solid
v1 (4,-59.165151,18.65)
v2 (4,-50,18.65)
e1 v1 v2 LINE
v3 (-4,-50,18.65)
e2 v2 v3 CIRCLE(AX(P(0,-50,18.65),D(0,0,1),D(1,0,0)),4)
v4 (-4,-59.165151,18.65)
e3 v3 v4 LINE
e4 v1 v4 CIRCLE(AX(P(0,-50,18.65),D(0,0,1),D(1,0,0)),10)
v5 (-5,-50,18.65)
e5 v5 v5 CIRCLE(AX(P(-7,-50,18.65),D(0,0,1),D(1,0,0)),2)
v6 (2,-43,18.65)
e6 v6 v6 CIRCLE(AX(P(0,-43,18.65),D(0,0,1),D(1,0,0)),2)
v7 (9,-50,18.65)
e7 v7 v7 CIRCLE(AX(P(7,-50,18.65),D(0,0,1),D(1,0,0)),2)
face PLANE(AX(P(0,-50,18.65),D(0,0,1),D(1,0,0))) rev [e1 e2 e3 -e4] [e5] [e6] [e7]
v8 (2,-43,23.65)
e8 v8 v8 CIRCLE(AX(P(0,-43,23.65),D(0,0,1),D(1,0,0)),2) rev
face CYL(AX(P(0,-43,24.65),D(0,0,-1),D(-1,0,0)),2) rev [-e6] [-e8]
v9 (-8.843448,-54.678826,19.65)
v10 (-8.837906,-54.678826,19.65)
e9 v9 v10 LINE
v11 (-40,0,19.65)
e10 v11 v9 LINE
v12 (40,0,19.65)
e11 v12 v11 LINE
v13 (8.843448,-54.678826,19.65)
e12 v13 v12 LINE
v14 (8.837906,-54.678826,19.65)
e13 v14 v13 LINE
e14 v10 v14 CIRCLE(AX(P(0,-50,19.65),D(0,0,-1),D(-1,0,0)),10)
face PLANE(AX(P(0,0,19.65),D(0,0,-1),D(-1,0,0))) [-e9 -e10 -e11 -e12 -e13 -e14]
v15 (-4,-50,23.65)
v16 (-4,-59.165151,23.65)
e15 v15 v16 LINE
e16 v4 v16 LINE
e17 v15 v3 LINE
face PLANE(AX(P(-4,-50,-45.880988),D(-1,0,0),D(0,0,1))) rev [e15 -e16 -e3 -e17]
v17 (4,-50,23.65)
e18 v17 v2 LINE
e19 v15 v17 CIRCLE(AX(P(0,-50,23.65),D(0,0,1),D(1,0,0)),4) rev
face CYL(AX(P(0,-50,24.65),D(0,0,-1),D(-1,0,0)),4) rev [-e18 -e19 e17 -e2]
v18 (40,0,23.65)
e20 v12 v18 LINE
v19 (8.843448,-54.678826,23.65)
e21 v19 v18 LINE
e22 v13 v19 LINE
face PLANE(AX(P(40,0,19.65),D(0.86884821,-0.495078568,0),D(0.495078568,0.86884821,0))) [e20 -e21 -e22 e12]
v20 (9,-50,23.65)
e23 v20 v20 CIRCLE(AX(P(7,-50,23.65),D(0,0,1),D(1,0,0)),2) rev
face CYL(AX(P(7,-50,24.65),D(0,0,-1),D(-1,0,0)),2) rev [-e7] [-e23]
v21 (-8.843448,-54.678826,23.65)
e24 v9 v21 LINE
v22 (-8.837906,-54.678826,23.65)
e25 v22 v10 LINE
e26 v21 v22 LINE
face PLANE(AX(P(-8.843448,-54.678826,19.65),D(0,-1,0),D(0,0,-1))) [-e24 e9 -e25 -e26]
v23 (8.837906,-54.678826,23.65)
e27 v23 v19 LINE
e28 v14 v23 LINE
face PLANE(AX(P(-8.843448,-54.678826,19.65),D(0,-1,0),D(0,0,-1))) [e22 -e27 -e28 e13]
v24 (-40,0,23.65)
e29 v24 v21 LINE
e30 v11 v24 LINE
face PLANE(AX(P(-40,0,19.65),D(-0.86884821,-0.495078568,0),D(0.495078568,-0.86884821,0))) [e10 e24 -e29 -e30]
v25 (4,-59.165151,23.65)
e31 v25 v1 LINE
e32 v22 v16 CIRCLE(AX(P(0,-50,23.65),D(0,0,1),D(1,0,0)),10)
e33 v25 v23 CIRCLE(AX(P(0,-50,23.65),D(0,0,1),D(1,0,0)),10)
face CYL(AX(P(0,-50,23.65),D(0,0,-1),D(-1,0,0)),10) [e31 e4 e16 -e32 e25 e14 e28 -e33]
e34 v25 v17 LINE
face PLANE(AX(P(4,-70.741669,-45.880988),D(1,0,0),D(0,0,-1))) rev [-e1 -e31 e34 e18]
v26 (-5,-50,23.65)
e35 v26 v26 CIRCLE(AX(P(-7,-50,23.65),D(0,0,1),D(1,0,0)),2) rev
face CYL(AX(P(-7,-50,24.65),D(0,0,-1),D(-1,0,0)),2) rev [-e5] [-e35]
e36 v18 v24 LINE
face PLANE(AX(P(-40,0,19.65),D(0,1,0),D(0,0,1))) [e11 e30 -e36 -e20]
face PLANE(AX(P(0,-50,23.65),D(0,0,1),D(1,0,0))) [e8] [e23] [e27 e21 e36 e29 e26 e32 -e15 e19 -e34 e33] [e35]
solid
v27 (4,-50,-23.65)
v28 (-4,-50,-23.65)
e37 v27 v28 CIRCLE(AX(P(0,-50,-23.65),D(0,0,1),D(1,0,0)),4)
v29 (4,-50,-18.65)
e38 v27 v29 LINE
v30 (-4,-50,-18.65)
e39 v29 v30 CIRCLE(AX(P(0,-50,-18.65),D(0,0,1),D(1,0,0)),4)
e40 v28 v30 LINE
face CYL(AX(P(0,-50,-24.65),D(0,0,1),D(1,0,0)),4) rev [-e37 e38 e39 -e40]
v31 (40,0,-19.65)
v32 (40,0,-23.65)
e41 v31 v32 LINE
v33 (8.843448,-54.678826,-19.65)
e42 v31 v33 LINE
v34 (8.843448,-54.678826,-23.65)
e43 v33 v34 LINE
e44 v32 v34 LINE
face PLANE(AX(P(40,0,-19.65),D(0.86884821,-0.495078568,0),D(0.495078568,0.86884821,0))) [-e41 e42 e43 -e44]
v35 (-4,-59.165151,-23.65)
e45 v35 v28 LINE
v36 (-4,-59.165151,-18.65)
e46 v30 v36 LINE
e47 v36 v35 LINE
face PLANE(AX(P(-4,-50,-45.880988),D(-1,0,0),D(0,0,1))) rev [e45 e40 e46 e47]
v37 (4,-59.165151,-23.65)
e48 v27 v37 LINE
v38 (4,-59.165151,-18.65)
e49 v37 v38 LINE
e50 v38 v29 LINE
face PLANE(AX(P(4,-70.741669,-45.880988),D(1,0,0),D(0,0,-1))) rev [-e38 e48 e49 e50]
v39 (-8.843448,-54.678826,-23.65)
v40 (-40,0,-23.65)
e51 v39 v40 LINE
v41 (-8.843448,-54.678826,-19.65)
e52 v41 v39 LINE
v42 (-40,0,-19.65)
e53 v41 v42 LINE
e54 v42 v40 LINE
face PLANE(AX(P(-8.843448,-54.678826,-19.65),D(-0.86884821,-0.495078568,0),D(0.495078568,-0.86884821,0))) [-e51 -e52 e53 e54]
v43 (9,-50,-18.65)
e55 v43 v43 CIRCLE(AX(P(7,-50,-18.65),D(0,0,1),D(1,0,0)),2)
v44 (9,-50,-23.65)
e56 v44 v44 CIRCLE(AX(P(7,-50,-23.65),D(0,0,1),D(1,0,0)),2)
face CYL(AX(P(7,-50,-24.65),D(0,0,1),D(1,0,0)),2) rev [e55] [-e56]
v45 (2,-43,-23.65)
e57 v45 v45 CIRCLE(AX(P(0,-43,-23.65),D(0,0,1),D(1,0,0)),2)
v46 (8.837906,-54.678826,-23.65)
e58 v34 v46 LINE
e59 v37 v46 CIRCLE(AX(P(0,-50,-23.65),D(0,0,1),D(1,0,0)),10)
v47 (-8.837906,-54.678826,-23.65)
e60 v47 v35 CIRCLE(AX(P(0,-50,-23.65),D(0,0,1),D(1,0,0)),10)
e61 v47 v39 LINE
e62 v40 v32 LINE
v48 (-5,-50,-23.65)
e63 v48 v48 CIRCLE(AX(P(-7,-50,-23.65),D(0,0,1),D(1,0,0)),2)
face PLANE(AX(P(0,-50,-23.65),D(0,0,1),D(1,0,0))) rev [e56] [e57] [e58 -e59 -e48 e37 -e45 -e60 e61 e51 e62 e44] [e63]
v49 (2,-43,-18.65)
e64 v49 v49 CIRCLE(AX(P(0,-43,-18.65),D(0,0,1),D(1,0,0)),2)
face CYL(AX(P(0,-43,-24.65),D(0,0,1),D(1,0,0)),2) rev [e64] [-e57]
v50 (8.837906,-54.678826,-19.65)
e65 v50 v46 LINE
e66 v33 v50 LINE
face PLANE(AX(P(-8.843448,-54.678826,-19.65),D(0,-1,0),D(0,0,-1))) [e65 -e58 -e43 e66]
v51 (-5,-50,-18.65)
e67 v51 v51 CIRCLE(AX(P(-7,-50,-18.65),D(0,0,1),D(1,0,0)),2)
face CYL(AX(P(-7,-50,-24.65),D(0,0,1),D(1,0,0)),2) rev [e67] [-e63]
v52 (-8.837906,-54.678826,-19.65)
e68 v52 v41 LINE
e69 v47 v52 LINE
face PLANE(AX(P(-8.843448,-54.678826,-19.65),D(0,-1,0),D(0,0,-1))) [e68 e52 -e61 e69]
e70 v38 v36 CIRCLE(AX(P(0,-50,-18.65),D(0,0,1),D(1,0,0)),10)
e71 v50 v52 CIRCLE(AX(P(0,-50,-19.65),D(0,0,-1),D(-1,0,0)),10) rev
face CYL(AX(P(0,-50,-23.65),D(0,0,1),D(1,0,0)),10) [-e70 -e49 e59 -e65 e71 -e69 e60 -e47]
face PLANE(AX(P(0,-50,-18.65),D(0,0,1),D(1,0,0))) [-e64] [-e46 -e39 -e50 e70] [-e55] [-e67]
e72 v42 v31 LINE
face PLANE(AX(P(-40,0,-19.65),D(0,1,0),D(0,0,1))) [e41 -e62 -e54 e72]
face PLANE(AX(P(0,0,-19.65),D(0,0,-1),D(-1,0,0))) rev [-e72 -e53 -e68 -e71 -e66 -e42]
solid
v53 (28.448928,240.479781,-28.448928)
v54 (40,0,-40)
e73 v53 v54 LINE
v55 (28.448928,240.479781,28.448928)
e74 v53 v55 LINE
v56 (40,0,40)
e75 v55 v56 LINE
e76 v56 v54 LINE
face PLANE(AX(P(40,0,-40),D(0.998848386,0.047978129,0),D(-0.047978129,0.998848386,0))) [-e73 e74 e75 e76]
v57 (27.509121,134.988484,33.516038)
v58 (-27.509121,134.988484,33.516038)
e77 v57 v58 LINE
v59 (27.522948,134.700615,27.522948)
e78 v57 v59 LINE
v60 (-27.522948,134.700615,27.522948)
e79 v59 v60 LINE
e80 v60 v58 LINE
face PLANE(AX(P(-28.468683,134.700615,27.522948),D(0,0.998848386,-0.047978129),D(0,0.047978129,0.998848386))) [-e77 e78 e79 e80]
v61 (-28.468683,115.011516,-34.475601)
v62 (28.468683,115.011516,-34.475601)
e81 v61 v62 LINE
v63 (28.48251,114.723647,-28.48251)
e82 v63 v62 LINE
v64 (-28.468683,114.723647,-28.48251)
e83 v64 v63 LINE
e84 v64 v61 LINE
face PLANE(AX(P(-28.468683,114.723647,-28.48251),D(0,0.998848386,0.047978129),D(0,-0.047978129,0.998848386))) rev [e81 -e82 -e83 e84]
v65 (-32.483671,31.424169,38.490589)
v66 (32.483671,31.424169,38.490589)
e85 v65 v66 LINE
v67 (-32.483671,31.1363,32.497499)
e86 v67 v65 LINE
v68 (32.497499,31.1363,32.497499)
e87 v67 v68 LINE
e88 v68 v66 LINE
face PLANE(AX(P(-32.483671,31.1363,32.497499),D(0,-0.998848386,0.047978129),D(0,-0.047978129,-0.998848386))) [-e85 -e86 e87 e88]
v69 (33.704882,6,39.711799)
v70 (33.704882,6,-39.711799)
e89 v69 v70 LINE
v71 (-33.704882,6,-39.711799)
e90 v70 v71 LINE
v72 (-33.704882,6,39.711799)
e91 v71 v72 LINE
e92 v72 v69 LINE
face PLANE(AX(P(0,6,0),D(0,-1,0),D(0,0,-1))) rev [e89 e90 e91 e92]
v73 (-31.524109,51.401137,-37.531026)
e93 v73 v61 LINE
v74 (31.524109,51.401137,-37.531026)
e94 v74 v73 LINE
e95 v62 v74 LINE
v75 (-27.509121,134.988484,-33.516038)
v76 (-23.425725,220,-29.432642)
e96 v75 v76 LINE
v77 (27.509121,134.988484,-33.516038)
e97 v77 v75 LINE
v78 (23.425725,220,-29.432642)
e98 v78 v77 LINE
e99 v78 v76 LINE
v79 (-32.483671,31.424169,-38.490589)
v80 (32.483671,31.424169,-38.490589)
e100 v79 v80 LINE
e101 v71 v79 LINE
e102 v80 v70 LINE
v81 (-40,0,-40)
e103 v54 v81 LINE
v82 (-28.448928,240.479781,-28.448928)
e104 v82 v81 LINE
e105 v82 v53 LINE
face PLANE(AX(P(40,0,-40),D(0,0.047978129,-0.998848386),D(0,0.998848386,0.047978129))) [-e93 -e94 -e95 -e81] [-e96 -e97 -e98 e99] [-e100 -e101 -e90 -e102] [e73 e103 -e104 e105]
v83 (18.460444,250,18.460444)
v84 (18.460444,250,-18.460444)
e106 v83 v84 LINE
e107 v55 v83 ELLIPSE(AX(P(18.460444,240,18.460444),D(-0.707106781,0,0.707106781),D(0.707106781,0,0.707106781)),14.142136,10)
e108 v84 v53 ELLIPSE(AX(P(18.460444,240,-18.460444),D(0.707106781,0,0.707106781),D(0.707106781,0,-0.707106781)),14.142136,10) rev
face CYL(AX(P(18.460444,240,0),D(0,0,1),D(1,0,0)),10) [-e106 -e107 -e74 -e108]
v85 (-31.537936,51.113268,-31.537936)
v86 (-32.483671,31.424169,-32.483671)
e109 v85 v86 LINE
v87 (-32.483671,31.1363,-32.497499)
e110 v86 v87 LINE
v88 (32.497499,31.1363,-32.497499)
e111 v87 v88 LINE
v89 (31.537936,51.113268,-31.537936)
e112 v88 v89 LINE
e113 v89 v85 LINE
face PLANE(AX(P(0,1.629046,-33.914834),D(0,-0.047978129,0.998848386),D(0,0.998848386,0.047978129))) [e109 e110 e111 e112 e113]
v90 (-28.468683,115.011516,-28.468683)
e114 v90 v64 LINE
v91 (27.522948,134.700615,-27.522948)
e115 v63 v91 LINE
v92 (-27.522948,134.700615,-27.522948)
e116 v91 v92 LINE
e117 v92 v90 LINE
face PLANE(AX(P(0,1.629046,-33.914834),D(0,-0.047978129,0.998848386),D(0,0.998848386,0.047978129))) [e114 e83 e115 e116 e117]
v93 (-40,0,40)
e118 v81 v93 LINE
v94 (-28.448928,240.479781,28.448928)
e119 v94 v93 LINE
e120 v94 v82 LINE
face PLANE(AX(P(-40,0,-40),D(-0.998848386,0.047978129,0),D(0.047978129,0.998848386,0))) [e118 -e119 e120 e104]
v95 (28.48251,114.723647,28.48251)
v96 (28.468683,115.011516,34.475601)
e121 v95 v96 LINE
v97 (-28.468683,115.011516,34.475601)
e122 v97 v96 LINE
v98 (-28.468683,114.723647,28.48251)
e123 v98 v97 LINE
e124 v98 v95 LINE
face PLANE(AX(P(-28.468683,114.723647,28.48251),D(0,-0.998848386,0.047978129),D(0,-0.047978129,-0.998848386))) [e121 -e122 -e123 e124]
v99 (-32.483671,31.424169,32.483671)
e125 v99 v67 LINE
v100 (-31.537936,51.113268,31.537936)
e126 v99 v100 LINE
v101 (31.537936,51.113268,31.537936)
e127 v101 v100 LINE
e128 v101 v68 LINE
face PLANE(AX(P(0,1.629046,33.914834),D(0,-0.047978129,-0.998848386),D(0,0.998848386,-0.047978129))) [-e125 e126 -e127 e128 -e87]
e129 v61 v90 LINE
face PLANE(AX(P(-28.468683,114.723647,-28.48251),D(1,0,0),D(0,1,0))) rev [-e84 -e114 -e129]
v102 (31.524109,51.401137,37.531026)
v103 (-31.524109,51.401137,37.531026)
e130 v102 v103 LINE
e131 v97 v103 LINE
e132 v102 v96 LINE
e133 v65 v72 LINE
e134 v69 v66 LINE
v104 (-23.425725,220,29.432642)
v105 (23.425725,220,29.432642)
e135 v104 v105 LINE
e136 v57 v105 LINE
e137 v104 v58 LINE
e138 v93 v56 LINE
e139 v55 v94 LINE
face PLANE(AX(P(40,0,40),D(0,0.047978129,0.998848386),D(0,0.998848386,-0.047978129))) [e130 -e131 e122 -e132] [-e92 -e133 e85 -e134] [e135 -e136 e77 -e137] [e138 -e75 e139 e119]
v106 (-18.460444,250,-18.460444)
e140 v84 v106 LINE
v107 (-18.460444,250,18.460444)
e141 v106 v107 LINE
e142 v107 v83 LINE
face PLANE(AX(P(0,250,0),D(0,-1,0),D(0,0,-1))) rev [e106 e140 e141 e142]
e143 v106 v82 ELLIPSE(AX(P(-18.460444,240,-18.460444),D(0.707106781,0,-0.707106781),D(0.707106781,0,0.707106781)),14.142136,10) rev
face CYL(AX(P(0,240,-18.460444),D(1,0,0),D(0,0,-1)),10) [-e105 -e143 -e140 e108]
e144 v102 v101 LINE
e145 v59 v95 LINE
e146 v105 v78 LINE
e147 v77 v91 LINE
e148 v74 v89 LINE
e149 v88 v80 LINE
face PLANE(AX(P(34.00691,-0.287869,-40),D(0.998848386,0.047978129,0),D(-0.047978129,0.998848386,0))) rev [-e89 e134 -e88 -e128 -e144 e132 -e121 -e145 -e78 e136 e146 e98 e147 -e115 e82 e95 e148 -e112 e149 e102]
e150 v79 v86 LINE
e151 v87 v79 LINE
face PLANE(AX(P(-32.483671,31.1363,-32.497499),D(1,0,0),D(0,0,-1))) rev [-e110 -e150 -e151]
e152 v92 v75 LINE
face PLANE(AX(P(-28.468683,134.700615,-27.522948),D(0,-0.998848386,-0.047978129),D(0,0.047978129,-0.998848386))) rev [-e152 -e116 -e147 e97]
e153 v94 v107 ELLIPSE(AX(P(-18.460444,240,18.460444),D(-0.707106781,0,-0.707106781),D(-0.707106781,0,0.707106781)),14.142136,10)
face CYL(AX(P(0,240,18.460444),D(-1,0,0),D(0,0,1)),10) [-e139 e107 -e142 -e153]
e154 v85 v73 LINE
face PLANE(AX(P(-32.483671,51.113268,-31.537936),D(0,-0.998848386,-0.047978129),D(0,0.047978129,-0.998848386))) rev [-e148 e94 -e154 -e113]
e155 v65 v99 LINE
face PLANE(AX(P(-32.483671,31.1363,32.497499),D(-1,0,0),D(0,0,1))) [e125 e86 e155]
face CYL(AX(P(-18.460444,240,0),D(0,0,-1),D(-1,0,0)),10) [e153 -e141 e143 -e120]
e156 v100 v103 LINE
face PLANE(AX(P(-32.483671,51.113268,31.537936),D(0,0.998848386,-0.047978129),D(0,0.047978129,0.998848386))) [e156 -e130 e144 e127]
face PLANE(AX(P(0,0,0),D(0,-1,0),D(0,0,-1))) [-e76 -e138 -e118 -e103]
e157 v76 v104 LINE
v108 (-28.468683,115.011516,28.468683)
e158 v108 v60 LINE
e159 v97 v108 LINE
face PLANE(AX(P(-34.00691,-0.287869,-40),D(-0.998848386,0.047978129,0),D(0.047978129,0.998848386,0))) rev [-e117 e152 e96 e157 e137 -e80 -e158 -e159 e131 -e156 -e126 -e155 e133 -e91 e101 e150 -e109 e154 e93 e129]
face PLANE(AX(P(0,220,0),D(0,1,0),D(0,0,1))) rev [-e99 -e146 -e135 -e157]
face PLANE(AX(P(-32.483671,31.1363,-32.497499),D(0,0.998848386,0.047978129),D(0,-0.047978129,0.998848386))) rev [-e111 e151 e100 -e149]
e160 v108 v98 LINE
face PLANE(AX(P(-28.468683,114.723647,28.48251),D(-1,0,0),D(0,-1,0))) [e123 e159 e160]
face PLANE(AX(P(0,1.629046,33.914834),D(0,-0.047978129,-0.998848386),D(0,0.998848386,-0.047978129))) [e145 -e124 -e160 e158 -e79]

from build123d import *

# Parameters (mm, degrees)
CROQUIS3_W                 = 80
CROQUIS3_H                 = 80
SALIENTE_EXTRUIR2_DEPTH    = 250
SALIENTE_EXTRUIR2_TAPER    = 2.75
VACIADO1_T                 = 6
CORTAR_EXTRUIR6_DEPTH      = 50
CORTAR_EXTRUIR6_DEPTH_BACK = 50
CROQUIS26_W                = 70.014697611
CROQUIS26_H                = 20
CROQUIS26_W_2              = 61.984721231
SALIENTE_EXTRUIR4_DEPTH    = 6
CROQUIS29_W                = 55.983277758
CROQUIS29_H                = 55.983277758
SALIENTE_EXTRUIR5_DEPTH    = 30
SALIENTE_EXTRUIR5_DRAFT    = 2.75
CROQUIS31_R                = 10
SALIENTE_EXTRUIR6_DEPTH    = 5
SALIENTE_EXTRUIR7_DEPTH    = 4
CROQUIS31_3_R              = 4
CROQUIS31_3_R_2            = 2
CORTAR_EXTRUIR10_DEPTH     = 6
CROQUIS33_R                = 10
SALIENTE_EXTRUIR8_DEPTH    = 5
SALIENTE_EXTRUIR9_DEPTH    = 4
CROQUIS33_3_R              = 2
CROQUIS33_3_R_2            = 4
CORTAR_EXTRUIR11_DEPTH     = 6
FILLET2_R                  = 10
CORTAR_EXTRUIR12_START     = -47.3
CROQUIS35_W                = 8
CROQUIS35_H                = 20.741669121
CORTAR_EXTRUIR12_DEPTH     = 47.3


with BuildPart() as part:
    # Croquis3 → Saliente-Extruir2 (new body)
    with BuildSketch(Plane(origin=(0, 0, 0), x_dir=(-1, 0, 0), z_dir=(0, 1, 0))):
        Rectangle(CROQUIS3_W, CROQUIS3_H)
    extrude(amount=SALIENTE_EXTRUIR2_DEPTH, taper=SALIENTE_EXTRUIR2_TAPER)

    # Vaciado1 (no face opened: a closed hollow body)
    add(offset(amount=-VACIADO1_T, mode=Mode.PRIVATE), mode=Mode.SUBTRACT)

    # Croquis24 → Cortar-Extruir6 (cut, two sides: drawn at the far end of the back side and taken through both)
    with BuildSketch(Plane(origin=(0, 0, 0), x_dir=(0, 1, 0), z_dir=(0, 0, 1)).offset(-CORTAR_EXTRUIR6_DEPTH_BACK)):
        Polygon((6, 33.704881686), (6, -33.704881686), (244, -22.272921898), (244, 22.272921898), align=None)
    extrude(amount=CORTAR_EXTRUIR6_DEPTH + CORTAR_EXTRUIR6_DEPTH_BACK, mode=Mode.SUBTRACT)

    # Croquis26 → Saliente-Extruir4 (add)
    with BuildSketch(Plane(origin=(0, 1.91691505, 39.907923967), x_dir=(1, 0, 0), z_dir=(0, 0.04797812852134405, 0.9988483864849507))):
        with Locations((2.523677538, 39.541274251)):
            Rectangle(CROQUIS26_W, CROQUIS26_H)
        with Locations((2.523677538, 123.224992516)):
            Rectangle(CROQUIS26_W_2, CROQUIS26_H)
    saliente_extruir4 = extrude(amount=-SALIENTE_EXTRUIR4_DEPTH)

    # Simetría1: Saliente-Extruir4 across plane
    add(saliente_extruir4.mirror(Plane.XY))


with BuildPart() as saliente_extruir5_tool:
    # Croquis29 → Saliente-Extruir5 (with draft: the straight prism first)
    with BuildSketch(Plane(origin=(0, 250, 0), x_dir=(-1, 0, 0), z_dir=(0, 1, 0))):
        Rectangle(CROQUIS29_W, CROQUIS29_H)
    extrude(amount=-SALIENTE_EXTRUIR5_DEPTH)
    # Saliente-Extruir5: the draft: its side faces are tilted about the plane it starts from
    saliente_extruir5_sides = [saliente_extruir5_tool.faces().sort_by_distance(p)[0] for p in [
        (27.991638879, 235, 0),
        (0, 235, -27.991638879),
        (-27.991638879, 235, 0),
        (0, 235, 27.991638879),
    ]]
    draft(saliente_extruir5_sides, Plane(origin=(0, 250, 0), x_dir=(-1, 0, 0), z_dir=(0, 1, 0)), SALIENTE_EXTRUIR5_DRAFT)


with BuildPart() as part_1:
    add(part.part)

    # Saliente-Extruir5: add saliente_extruir5_tool
    add(saliente_extruir5_tool.part)

    # Fillet2
    # the kernel refuses this fillet: 10 mm, written as the material it takes off along each edge
    with BuildSketch(Plane(origin=(27.991638879, 250, 51.819626298), x_dir=(0.04797812852134406, -0.9988483864849508, 0), z_dir=(0, 0, -1))) as fillet2_piece_1:
        with BuildLine():
            CenterArc((FILLET2_R * 0.953119496773, FILLET2_R), FILLET2_R, 182.75, 87.25)
            Line((-FILLET2_R * 0.0457288897124, FILLET2_R * 0.952021871479), (0, 0))
            Line((0, 0), (FILLET2_R * 0.953119496773, 0))
        make_face()
    extrude(amount=103.639252596, mode=Mode.SUBTRACT)
    with BuildSketch(Plane(origin=(51.819626298, 250, -27.991638879), x_dir=(0, -0.9988483864849508, -0.04797812852134406), z_dir=(-1, 0, 0))) as fillet2_piece_2:
        with BuildLine():
            CenterArc((FILLET2_R * 0.953119496773, FILLET2_R), FILLET2_R, 182.75, 87.25)
            Line((-FILLET2_R * 0.0457288897124, FILLET2_R * 0.952021871479), (0, 0))
            Line((0, 0), (FILLET2_R * 0.953119496773, 0))
        make_face()
    extrude(amount=29.377616399, mode=Mode.SUBTRACT)
    with BuildSketch(Plane(origin=(22.442009899, 250, -27.991638879), x_dir=(0, -0.9988483864849506, -0.04797812852134443), z_dir=(-1, 0, 0))) as fillet2_piece_3:
        with BuildLine():
            CenterArc((9.531194968, 10), FILLET2_R, 182.75, 87.25)
            Line((-0.457288897, 9.520218715), (-1.456137284, 9.472240586))
            Line((-1.456137284, 9.472240586), (-0.953119497, -1))
            Line((-0.953119497, -1), (9.531194968, -1))
            Line((9.531194968, -1), (9.531194968, 0))
        make_face()
    extrude(amount=44.714932797, mode=Mode.SUBTRACT)
    with BuildSketch(Plane(origin=(-22.272922898, 250, -27.991638879), x_dir=(0, -0.9988483864849508, -0.04797812852134406), z_dir=(-1, 0, 0))) as fillet2_piece_4:
        with BuildLine():
            CenterArc((FILLET2_R * 0.953119496773, FILLET2_R), FILLET2_R, 182.75, 87.25)
            Line((-FILLET2_R * 0.0457288897124, FILLET2_R * 0.952021871479), (0, 0))
            Line((0, 0), (FILLET2_R * 0.953119496773, 0))
        make_face()
    extrude(amount=29.5467034, mode=Mode.SUBTRACT)
    with BuildSketch(Plane(origin=(-27.991638879, 250, -51.819626298), x_dir=(1, 0, 0), z_dir=(0, 0, 1))) as fillet2_piece_5:
        with BuildLine():
            CenterArc((FILLET2_R * 0.953119496773, -FILLET2_R), FILLET2_R, 90, 87.25)
            Line((-FILLET2_R * 0.0457288897124, -FILLET2_R * 0.952021871479), (0, 0))
            Line((0, 0), (FILLET2_R * 0.953119496773, 0))
        make_face()
    extrude(amount=103.639252596, mode=Mode.SUBTRACT)
    with BuildSketch(Plane(origin=(-51.819626298, 250, 27.991638879), x_dir=(0, 0, -1), z_dir=(1, 0, 0))) as fillet2_piece_6:
        with BuildLine():
            CenterArc((FILLET2_R * 0.953119496773, -FILLET2_R), FILLET2_R, 90, 87.25)
            Line((-FILLET2_R * 0.0457288897124, -FILLET2_R * 0.952021871479), (0, 0))
            Line((0, 0), (FILLET2_R * 0.953119496773, 0))
        make_face()
    extrude(amount=29.377616399, mode=Mode.SUBTRACT)
    with BuildSketch(Plane(origin=(-22.442009899, 250, 27.991638879), x_dir=(0, 0, -1), z_dir=(1, 0, 0))) as fillet2_piece_7:
        with BuildLine():
            CenterArc((9.531194968, -10), FILLET2_R, 90, 87.25)
            Line((-0.457288897, -9.520218715), (-1.456137284, -9.472240586))
            Line((-1.456137284, -9.472240586), (-0.953119497, 1))
            Line((-0.953119497, 1), (9.531194968, 1))
            Line((9.531194968, 1), (9.531194968, 0))
        make_face()
    extrude(amount=44.714932797, mode=Mode.SUBTRACT)
    with BuildSketch(Plane(origin=(22.272922898, 250, 27.991638879), x_dir=(0, 0, -1), z_dir=(1, 0, 0))) as fillet2_piece_8:
        with BuildLine():
            CenterArc((FILLET2_R * 0.953119496773, -FILLET2_R), FILLET2_R, 90, 87.25)
            Line((-FILLET2_R * 0.0457288897124, -FILLET2_R * 0.952021871479), (0, 0))
            Line((0, 0), (FILLET2_R * 0.953119496773, 0))
        make_face()
    extrude(amount=29.5467034, mode=Mode.SUBTRACT)


with BuildPart() as body_2:
    # Croquis31 → Saliente-Extruir6 (new body)
    with BuildSketch(Plane(origin=(0, 0, 18.65), x_dir=(0, 1, 0), z_dir=(0, 0, 1))):
        with Locations(Location((-50, 0, 0), (0, 0, 270))):
            Circle(CROQUIS31_R)
    extrude(amount=SALIENTE_EXTRUIR6_DEPTH)

    # Croquis32 → Saliente-Extruir7 (add)
    with BuildSketch(Plane.XY.offset(23.65)):
        Polygon((-40, 0), (-8.843447734, -54.678825581), (8.843447734, -54.678825581), (40, 0), align=None)
    extrude(amount=-SALIENTE_EXTRUIR7_DEPTH)

    # Croquis31<3> → Cortar-Extruir10 (cut)
    with BuildSketch(Plane(origin=(0, 0, 18.65), x_dir=(0, 1, 0), z_dir=(0, 0, 1))):
        with Locations(Location((-50, 0, 0), (0, 0, 270))):
            Circle(CROQUIS31_3_R)
        with Locations(Location((-50, 7, 0), (0, 0, 270))):
            Circle(CROQUIS31_3_R_2)
        with Locations(Location((-43, 0, 0), (0, 0, 270))):
            Circle(CROQUIS31_3_R_2)
        with Locations(Location((-50, -7, 0), (0, 0, 270))):
            Circle(CROQUIS31_3_R_2)
        with Locations(Location((-57, 0, 0), (0, 0, 270))):
            Circle(CROQUIS31_3_R_2)
    extrude(amount=CORTAR_EXTRUIR10_DEPTH, mode=Mode.SUBTRACT)


with BuildPart() as body_3:
    # Croquis33 → Saliente-Extruir8 (new body)
    with BuildSketch(Plane(origin=(0, 0, -18.65), x_dir=(0, 1, 0), z_dir=(0, 0, 1))):
        with Locations(Location((-50, 0, 0), (0, 0, 270))):
            Circle(CROQUIS33_R)
    extrude(amount=-SALIENTE_EXTRUIR8_DEPTH)

    # Croquis34 → Saliente-Extruir9 (add)
    with BuildSketch(Plane(origin=(0, 0, -23.65), x_dir=(1, 0, 0), z_dir=(0, 0, -1))):
        Polygon((-8.843447734, 54.678825581), (-40, 0), (40, 0), (8.843447734, 54.678825581), align=None)
    extrude(amount=-SALIENTE_EXTRUIR9_DEPTH)

    # Croquis33<3> → Cortar-Extruir11 (cut)
    with BuildSketch(Plane(origin=(0, 0, -18.65), x_dir=(0, 1, 0), z_dir=(0, 0, 1))):
        with Locations(Location((-43, 0, 0), (0, 0, 270))):
            Circle(CROQUIS33_3_R)
        with Locations(Location((-57, 0, 0), (0, 0, 270))):
            Circle(CROQUIS33_3_R)
        with Locations(Location((-50, -7, 0), (0, 0, 270))):
            Circle(CROQUIS33_3_R)
        with Locations(Location((-50, 7, 0), (0, 0, 270))):
            Circle(CROQUIS33_3_R)
        with Locations(Location((-50, 0, 0), (0, 0, 270))):
            Circle(CROQUIS33_3_R_2)
    extrude(amount=-CORTAR_EXTRUIR11_DEPTH, mode=Mode.SUBTRACT)


with BuildPart() as cortar_extruir12_tool:
    # Croquis35 → Cortar-Extruir12 (new body)
    with BuildSketch(Plane.XY.offset(23.65).offset(CORTAR_EXTRUIR12_START)):
        with Locations((0, -60.370834561)):
            Rectangle(CROQUIS35_W, CROQUIS35_H)
    extrude(amount=CORTAR_EXTRUIR12_DEPTH)


with BuildPart() as body_2_1:
    add(body_2.part)

    # Cortar-Extruir12: cut by cortar_extruir12_tool
    add(cortar_extruir12_tool.part, mode=Mode.SUBTRACT)


with BuildPart() as body_3_1:
    add(body_3.part)

    # Cortar-Extruir12: cut by cortar_extruir12_tool
    add(cortar_extruir12_tool.part, mode=Mode.SUBTRACT)


solid = Compound([part_1.part, body_2_1.part, body_3_1.part])
